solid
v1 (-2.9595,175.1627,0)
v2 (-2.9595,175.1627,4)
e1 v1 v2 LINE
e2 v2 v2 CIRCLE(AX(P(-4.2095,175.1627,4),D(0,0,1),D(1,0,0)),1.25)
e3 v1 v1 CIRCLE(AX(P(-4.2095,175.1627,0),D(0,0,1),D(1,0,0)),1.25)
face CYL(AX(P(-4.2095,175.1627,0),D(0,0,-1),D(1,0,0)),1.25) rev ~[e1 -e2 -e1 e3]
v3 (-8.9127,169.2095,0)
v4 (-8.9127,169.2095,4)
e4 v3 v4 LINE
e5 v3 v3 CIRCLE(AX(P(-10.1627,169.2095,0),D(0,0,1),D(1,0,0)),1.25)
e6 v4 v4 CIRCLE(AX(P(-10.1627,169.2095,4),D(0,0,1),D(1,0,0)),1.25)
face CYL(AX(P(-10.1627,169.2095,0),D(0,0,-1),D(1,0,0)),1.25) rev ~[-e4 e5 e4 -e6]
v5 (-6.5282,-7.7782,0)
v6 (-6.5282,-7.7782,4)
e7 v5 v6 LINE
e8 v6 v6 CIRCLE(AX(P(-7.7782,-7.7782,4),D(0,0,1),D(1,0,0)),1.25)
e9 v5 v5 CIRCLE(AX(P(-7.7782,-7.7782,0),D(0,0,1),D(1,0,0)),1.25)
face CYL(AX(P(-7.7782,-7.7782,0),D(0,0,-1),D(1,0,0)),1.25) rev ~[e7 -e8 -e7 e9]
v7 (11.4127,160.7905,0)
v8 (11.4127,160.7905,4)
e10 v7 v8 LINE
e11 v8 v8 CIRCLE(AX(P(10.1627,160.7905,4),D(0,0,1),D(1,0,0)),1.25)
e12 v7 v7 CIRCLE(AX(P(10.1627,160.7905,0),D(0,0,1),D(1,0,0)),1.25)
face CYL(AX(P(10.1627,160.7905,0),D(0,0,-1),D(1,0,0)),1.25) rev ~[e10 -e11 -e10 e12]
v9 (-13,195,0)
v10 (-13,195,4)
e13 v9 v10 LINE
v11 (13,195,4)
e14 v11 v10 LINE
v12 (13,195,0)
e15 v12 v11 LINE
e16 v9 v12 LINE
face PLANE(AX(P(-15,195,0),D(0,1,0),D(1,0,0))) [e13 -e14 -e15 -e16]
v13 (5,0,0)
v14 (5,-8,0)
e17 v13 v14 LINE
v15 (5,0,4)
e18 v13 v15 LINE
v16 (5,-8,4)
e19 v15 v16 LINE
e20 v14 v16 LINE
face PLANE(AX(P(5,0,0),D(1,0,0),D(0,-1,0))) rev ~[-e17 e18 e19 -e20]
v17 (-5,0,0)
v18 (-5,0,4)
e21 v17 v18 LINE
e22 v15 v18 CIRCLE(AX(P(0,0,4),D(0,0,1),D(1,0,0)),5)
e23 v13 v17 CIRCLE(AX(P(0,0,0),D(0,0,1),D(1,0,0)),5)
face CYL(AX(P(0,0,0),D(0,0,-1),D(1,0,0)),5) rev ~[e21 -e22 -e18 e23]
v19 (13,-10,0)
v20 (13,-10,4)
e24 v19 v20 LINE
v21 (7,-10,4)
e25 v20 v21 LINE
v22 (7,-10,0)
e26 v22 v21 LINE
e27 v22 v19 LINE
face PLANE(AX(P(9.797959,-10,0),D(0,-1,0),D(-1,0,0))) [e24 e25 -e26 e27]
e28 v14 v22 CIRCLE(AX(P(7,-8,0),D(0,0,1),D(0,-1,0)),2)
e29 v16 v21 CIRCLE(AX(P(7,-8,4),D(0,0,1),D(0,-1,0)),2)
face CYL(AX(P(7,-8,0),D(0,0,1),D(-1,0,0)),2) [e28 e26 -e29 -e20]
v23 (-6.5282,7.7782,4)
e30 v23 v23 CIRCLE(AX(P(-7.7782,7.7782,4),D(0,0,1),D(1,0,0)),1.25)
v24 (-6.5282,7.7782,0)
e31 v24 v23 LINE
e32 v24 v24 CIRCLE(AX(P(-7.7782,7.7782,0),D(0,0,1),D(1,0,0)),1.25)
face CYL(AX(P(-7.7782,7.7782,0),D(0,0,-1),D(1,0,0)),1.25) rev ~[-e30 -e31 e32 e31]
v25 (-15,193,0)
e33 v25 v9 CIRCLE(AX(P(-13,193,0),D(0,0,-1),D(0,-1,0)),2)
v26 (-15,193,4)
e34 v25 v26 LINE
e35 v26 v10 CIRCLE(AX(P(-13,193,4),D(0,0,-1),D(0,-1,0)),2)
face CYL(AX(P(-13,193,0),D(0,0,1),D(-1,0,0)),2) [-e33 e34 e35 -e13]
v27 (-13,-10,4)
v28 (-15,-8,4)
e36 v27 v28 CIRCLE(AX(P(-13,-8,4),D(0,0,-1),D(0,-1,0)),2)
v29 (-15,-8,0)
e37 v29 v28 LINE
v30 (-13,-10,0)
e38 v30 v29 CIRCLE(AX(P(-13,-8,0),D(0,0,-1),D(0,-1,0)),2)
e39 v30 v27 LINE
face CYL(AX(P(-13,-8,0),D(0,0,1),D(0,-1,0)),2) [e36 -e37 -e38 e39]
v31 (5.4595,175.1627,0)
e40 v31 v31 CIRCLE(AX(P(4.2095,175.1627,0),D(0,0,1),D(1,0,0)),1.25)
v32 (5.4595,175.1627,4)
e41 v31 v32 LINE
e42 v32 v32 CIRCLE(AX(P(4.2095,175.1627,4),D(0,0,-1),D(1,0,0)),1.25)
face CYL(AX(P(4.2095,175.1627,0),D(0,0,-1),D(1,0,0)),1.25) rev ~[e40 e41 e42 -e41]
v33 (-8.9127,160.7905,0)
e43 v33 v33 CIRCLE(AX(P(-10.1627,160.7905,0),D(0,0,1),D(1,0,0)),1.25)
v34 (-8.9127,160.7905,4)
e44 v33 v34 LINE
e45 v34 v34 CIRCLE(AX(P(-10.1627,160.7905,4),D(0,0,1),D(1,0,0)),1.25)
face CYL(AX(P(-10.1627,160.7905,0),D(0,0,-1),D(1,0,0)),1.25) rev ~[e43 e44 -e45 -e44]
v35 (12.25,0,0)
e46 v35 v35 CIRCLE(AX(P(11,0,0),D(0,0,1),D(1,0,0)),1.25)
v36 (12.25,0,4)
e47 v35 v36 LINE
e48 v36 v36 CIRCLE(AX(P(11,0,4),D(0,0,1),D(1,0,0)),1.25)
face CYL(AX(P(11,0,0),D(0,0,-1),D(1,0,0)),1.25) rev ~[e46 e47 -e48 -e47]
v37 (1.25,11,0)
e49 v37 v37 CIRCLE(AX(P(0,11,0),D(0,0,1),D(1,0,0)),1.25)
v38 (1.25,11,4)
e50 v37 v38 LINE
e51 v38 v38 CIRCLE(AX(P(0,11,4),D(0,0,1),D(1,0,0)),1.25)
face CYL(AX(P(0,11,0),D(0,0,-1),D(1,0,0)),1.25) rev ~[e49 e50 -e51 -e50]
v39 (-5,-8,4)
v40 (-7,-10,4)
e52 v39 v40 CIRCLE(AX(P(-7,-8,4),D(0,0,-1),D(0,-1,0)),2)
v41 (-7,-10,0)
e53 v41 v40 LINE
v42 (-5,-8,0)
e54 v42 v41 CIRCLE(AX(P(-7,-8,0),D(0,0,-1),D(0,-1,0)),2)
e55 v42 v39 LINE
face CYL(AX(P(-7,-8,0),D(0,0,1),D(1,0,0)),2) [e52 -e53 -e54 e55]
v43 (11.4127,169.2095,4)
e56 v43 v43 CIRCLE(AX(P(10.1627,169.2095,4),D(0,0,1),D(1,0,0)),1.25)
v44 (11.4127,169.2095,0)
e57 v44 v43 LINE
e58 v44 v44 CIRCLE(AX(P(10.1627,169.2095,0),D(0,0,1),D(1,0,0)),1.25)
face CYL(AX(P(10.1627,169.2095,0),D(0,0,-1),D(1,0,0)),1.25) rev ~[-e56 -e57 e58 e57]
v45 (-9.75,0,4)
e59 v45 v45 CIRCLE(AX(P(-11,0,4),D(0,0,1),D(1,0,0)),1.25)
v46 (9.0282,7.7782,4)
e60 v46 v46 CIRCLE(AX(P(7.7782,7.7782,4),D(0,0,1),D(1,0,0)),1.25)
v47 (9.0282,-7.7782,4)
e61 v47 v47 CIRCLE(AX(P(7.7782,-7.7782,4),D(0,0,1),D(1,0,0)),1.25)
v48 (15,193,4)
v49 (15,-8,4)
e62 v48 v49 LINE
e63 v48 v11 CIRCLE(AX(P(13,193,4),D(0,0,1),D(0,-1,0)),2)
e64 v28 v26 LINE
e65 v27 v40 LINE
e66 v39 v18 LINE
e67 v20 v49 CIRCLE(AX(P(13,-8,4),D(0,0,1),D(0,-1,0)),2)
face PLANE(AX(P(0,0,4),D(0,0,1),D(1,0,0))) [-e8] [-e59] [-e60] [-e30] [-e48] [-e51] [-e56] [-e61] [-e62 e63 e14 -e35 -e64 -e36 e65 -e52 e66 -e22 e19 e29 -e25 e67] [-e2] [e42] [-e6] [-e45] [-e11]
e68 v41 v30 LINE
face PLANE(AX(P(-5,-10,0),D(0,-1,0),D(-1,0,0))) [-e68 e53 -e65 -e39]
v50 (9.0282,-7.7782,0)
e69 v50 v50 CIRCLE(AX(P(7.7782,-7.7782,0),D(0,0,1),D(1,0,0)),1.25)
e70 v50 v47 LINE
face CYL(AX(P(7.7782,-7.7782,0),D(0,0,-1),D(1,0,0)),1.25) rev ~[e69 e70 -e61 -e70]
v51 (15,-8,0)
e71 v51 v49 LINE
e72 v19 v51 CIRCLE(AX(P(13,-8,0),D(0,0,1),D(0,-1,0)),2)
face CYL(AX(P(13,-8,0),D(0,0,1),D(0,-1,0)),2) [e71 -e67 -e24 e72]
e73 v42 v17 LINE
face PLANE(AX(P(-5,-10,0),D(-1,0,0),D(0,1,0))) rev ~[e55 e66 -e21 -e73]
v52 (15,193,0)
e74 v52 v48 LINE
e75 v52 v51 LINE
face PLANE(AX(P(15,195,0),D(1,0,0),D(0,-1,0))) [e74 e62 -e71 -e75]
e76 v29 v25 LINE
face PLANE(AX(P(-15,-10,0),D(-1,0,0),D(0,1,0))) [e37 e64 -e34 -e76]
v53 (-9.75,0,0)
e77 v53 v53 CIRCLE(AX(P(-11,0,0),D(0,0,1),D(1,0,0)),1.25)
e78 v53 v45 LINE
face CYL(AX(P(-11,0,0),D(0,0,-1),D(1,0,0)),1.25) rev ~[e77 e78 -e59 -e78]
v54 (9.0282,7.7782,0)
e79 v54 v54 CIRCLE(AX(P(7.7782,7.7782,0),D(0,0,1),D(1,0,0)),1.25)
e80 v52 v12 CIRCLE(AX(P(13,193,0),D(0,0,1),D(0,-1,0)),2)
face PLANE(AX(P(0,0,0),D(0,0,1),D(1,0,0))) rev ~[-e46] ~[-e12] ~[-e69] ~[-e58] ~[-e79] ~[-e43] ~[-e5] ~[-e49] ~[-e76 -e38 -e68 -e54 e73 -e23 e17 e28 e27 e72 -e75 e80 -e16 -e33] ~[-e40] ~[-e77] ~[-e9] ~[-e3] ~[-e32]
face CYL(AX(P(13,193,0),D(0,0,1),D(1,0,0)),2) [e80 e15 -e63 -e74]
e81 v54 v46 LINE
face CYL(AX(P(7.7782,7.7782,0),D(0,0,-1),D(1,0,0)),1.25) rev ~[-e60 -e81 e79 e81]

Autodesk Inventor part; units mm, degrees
ref_plane "YZ Plane" through (0, 0, 0) normal (1, 0, 0) x (0, 1, 0)
ref_plane "XZ Plane" through (0, 0, 0) normal (0, 1, 0) x (-1, 0, 0)
ref_plane "XY Plane" through (0, 0, 0) normal (0, 0, 1) x (1, 0, 0)
sketch "스케치1" plane through (0, 0, 0) normal (0, 0, 1) x (1, 0, 0)
  circle A0 centre (7.7782, 7.7782) radius 1.25
  circle A1 centre (-7.7782, 7.7782) radius 1.25
  circle A2 centre (7.7782, -7.7782) radius 1.25
  circle A3 centre (-11, 0) radius 1.25
  circle A4 centre (11, 0) radius 1.25
  circle A5 centre (0, 11) radius 1.25
  circle A6 centre (0, -11) radius 1.25
  circle A7 centre (-7.7782, -7.7782) radius 1.25
  circle A8 centre (0, 0) radius 14
  circle A9 centre (0, 0) radius 5
  circle A10 centre (0, 0) radius 5
  line L0 (5, 0) -> (5, -10)
  line L1 (5, -10) -> (-5, -10)
  line L2 (-5, -10) -> (-5, 0)
  line L3 (15, -10) -> (-15, -10)
  line L4 (-15, -10) -> (-15, 195)
  line L5 (-15, 195) -> (15, 195)
  line L6 (15, 195) -> (15, -10)
  line L7 (0, 195) -> (0, 165)
  line L8 (0, 165) -> (4.2095, 175.1627)
  line L9 (0, 165) -> (11, 165) construction
  circle A11 centre (4.2095, 175.1627) radius 1.25
  circle A12 centre (-4.2095, 175.1627) radius 1.25
  circle A13 centre (-10.1627, 169.2095) radius 1.25
  circle A14 centre (-10.1627, 160.7905) radius 1.25
  circle A15 centre (-4.2095, 154.8373) radius 1.25
  circle A16 centre (4.2095, 154.8373) radius 1.25
  circle A17 centre (10.1627, 160.7905) radius 1.25
  circle A18 centre (10.1627, 169.2095) radius 1.25
  dimension "d0" = 10
  dimension "d2" = 30
  dimension "d3" = 205
  dimension "d4" = 30
  dimension "d6" = 11
  dimension "d7" = 67.5
  dimension "d8" = 2.5
  dimension "d11" = 360
extrude "판1" add sketch "스케치1" along normal blind 4 contours L0 A9 L2 L3 A8 | A8 L3 L4 L5 L6 | A15 | A16
fillet "모서리 라운드1" radius 2 6 edges at (15, -10, 2) (5, -10, 2) (-5, -10, 2) (-15, -10, 2) (15, 195, 2) (-15, 195, 2)
equation "\"TransitionRadius\" = BendRadius"
equation "\"BendRadius\" = 4"
properties part number "bar2"
